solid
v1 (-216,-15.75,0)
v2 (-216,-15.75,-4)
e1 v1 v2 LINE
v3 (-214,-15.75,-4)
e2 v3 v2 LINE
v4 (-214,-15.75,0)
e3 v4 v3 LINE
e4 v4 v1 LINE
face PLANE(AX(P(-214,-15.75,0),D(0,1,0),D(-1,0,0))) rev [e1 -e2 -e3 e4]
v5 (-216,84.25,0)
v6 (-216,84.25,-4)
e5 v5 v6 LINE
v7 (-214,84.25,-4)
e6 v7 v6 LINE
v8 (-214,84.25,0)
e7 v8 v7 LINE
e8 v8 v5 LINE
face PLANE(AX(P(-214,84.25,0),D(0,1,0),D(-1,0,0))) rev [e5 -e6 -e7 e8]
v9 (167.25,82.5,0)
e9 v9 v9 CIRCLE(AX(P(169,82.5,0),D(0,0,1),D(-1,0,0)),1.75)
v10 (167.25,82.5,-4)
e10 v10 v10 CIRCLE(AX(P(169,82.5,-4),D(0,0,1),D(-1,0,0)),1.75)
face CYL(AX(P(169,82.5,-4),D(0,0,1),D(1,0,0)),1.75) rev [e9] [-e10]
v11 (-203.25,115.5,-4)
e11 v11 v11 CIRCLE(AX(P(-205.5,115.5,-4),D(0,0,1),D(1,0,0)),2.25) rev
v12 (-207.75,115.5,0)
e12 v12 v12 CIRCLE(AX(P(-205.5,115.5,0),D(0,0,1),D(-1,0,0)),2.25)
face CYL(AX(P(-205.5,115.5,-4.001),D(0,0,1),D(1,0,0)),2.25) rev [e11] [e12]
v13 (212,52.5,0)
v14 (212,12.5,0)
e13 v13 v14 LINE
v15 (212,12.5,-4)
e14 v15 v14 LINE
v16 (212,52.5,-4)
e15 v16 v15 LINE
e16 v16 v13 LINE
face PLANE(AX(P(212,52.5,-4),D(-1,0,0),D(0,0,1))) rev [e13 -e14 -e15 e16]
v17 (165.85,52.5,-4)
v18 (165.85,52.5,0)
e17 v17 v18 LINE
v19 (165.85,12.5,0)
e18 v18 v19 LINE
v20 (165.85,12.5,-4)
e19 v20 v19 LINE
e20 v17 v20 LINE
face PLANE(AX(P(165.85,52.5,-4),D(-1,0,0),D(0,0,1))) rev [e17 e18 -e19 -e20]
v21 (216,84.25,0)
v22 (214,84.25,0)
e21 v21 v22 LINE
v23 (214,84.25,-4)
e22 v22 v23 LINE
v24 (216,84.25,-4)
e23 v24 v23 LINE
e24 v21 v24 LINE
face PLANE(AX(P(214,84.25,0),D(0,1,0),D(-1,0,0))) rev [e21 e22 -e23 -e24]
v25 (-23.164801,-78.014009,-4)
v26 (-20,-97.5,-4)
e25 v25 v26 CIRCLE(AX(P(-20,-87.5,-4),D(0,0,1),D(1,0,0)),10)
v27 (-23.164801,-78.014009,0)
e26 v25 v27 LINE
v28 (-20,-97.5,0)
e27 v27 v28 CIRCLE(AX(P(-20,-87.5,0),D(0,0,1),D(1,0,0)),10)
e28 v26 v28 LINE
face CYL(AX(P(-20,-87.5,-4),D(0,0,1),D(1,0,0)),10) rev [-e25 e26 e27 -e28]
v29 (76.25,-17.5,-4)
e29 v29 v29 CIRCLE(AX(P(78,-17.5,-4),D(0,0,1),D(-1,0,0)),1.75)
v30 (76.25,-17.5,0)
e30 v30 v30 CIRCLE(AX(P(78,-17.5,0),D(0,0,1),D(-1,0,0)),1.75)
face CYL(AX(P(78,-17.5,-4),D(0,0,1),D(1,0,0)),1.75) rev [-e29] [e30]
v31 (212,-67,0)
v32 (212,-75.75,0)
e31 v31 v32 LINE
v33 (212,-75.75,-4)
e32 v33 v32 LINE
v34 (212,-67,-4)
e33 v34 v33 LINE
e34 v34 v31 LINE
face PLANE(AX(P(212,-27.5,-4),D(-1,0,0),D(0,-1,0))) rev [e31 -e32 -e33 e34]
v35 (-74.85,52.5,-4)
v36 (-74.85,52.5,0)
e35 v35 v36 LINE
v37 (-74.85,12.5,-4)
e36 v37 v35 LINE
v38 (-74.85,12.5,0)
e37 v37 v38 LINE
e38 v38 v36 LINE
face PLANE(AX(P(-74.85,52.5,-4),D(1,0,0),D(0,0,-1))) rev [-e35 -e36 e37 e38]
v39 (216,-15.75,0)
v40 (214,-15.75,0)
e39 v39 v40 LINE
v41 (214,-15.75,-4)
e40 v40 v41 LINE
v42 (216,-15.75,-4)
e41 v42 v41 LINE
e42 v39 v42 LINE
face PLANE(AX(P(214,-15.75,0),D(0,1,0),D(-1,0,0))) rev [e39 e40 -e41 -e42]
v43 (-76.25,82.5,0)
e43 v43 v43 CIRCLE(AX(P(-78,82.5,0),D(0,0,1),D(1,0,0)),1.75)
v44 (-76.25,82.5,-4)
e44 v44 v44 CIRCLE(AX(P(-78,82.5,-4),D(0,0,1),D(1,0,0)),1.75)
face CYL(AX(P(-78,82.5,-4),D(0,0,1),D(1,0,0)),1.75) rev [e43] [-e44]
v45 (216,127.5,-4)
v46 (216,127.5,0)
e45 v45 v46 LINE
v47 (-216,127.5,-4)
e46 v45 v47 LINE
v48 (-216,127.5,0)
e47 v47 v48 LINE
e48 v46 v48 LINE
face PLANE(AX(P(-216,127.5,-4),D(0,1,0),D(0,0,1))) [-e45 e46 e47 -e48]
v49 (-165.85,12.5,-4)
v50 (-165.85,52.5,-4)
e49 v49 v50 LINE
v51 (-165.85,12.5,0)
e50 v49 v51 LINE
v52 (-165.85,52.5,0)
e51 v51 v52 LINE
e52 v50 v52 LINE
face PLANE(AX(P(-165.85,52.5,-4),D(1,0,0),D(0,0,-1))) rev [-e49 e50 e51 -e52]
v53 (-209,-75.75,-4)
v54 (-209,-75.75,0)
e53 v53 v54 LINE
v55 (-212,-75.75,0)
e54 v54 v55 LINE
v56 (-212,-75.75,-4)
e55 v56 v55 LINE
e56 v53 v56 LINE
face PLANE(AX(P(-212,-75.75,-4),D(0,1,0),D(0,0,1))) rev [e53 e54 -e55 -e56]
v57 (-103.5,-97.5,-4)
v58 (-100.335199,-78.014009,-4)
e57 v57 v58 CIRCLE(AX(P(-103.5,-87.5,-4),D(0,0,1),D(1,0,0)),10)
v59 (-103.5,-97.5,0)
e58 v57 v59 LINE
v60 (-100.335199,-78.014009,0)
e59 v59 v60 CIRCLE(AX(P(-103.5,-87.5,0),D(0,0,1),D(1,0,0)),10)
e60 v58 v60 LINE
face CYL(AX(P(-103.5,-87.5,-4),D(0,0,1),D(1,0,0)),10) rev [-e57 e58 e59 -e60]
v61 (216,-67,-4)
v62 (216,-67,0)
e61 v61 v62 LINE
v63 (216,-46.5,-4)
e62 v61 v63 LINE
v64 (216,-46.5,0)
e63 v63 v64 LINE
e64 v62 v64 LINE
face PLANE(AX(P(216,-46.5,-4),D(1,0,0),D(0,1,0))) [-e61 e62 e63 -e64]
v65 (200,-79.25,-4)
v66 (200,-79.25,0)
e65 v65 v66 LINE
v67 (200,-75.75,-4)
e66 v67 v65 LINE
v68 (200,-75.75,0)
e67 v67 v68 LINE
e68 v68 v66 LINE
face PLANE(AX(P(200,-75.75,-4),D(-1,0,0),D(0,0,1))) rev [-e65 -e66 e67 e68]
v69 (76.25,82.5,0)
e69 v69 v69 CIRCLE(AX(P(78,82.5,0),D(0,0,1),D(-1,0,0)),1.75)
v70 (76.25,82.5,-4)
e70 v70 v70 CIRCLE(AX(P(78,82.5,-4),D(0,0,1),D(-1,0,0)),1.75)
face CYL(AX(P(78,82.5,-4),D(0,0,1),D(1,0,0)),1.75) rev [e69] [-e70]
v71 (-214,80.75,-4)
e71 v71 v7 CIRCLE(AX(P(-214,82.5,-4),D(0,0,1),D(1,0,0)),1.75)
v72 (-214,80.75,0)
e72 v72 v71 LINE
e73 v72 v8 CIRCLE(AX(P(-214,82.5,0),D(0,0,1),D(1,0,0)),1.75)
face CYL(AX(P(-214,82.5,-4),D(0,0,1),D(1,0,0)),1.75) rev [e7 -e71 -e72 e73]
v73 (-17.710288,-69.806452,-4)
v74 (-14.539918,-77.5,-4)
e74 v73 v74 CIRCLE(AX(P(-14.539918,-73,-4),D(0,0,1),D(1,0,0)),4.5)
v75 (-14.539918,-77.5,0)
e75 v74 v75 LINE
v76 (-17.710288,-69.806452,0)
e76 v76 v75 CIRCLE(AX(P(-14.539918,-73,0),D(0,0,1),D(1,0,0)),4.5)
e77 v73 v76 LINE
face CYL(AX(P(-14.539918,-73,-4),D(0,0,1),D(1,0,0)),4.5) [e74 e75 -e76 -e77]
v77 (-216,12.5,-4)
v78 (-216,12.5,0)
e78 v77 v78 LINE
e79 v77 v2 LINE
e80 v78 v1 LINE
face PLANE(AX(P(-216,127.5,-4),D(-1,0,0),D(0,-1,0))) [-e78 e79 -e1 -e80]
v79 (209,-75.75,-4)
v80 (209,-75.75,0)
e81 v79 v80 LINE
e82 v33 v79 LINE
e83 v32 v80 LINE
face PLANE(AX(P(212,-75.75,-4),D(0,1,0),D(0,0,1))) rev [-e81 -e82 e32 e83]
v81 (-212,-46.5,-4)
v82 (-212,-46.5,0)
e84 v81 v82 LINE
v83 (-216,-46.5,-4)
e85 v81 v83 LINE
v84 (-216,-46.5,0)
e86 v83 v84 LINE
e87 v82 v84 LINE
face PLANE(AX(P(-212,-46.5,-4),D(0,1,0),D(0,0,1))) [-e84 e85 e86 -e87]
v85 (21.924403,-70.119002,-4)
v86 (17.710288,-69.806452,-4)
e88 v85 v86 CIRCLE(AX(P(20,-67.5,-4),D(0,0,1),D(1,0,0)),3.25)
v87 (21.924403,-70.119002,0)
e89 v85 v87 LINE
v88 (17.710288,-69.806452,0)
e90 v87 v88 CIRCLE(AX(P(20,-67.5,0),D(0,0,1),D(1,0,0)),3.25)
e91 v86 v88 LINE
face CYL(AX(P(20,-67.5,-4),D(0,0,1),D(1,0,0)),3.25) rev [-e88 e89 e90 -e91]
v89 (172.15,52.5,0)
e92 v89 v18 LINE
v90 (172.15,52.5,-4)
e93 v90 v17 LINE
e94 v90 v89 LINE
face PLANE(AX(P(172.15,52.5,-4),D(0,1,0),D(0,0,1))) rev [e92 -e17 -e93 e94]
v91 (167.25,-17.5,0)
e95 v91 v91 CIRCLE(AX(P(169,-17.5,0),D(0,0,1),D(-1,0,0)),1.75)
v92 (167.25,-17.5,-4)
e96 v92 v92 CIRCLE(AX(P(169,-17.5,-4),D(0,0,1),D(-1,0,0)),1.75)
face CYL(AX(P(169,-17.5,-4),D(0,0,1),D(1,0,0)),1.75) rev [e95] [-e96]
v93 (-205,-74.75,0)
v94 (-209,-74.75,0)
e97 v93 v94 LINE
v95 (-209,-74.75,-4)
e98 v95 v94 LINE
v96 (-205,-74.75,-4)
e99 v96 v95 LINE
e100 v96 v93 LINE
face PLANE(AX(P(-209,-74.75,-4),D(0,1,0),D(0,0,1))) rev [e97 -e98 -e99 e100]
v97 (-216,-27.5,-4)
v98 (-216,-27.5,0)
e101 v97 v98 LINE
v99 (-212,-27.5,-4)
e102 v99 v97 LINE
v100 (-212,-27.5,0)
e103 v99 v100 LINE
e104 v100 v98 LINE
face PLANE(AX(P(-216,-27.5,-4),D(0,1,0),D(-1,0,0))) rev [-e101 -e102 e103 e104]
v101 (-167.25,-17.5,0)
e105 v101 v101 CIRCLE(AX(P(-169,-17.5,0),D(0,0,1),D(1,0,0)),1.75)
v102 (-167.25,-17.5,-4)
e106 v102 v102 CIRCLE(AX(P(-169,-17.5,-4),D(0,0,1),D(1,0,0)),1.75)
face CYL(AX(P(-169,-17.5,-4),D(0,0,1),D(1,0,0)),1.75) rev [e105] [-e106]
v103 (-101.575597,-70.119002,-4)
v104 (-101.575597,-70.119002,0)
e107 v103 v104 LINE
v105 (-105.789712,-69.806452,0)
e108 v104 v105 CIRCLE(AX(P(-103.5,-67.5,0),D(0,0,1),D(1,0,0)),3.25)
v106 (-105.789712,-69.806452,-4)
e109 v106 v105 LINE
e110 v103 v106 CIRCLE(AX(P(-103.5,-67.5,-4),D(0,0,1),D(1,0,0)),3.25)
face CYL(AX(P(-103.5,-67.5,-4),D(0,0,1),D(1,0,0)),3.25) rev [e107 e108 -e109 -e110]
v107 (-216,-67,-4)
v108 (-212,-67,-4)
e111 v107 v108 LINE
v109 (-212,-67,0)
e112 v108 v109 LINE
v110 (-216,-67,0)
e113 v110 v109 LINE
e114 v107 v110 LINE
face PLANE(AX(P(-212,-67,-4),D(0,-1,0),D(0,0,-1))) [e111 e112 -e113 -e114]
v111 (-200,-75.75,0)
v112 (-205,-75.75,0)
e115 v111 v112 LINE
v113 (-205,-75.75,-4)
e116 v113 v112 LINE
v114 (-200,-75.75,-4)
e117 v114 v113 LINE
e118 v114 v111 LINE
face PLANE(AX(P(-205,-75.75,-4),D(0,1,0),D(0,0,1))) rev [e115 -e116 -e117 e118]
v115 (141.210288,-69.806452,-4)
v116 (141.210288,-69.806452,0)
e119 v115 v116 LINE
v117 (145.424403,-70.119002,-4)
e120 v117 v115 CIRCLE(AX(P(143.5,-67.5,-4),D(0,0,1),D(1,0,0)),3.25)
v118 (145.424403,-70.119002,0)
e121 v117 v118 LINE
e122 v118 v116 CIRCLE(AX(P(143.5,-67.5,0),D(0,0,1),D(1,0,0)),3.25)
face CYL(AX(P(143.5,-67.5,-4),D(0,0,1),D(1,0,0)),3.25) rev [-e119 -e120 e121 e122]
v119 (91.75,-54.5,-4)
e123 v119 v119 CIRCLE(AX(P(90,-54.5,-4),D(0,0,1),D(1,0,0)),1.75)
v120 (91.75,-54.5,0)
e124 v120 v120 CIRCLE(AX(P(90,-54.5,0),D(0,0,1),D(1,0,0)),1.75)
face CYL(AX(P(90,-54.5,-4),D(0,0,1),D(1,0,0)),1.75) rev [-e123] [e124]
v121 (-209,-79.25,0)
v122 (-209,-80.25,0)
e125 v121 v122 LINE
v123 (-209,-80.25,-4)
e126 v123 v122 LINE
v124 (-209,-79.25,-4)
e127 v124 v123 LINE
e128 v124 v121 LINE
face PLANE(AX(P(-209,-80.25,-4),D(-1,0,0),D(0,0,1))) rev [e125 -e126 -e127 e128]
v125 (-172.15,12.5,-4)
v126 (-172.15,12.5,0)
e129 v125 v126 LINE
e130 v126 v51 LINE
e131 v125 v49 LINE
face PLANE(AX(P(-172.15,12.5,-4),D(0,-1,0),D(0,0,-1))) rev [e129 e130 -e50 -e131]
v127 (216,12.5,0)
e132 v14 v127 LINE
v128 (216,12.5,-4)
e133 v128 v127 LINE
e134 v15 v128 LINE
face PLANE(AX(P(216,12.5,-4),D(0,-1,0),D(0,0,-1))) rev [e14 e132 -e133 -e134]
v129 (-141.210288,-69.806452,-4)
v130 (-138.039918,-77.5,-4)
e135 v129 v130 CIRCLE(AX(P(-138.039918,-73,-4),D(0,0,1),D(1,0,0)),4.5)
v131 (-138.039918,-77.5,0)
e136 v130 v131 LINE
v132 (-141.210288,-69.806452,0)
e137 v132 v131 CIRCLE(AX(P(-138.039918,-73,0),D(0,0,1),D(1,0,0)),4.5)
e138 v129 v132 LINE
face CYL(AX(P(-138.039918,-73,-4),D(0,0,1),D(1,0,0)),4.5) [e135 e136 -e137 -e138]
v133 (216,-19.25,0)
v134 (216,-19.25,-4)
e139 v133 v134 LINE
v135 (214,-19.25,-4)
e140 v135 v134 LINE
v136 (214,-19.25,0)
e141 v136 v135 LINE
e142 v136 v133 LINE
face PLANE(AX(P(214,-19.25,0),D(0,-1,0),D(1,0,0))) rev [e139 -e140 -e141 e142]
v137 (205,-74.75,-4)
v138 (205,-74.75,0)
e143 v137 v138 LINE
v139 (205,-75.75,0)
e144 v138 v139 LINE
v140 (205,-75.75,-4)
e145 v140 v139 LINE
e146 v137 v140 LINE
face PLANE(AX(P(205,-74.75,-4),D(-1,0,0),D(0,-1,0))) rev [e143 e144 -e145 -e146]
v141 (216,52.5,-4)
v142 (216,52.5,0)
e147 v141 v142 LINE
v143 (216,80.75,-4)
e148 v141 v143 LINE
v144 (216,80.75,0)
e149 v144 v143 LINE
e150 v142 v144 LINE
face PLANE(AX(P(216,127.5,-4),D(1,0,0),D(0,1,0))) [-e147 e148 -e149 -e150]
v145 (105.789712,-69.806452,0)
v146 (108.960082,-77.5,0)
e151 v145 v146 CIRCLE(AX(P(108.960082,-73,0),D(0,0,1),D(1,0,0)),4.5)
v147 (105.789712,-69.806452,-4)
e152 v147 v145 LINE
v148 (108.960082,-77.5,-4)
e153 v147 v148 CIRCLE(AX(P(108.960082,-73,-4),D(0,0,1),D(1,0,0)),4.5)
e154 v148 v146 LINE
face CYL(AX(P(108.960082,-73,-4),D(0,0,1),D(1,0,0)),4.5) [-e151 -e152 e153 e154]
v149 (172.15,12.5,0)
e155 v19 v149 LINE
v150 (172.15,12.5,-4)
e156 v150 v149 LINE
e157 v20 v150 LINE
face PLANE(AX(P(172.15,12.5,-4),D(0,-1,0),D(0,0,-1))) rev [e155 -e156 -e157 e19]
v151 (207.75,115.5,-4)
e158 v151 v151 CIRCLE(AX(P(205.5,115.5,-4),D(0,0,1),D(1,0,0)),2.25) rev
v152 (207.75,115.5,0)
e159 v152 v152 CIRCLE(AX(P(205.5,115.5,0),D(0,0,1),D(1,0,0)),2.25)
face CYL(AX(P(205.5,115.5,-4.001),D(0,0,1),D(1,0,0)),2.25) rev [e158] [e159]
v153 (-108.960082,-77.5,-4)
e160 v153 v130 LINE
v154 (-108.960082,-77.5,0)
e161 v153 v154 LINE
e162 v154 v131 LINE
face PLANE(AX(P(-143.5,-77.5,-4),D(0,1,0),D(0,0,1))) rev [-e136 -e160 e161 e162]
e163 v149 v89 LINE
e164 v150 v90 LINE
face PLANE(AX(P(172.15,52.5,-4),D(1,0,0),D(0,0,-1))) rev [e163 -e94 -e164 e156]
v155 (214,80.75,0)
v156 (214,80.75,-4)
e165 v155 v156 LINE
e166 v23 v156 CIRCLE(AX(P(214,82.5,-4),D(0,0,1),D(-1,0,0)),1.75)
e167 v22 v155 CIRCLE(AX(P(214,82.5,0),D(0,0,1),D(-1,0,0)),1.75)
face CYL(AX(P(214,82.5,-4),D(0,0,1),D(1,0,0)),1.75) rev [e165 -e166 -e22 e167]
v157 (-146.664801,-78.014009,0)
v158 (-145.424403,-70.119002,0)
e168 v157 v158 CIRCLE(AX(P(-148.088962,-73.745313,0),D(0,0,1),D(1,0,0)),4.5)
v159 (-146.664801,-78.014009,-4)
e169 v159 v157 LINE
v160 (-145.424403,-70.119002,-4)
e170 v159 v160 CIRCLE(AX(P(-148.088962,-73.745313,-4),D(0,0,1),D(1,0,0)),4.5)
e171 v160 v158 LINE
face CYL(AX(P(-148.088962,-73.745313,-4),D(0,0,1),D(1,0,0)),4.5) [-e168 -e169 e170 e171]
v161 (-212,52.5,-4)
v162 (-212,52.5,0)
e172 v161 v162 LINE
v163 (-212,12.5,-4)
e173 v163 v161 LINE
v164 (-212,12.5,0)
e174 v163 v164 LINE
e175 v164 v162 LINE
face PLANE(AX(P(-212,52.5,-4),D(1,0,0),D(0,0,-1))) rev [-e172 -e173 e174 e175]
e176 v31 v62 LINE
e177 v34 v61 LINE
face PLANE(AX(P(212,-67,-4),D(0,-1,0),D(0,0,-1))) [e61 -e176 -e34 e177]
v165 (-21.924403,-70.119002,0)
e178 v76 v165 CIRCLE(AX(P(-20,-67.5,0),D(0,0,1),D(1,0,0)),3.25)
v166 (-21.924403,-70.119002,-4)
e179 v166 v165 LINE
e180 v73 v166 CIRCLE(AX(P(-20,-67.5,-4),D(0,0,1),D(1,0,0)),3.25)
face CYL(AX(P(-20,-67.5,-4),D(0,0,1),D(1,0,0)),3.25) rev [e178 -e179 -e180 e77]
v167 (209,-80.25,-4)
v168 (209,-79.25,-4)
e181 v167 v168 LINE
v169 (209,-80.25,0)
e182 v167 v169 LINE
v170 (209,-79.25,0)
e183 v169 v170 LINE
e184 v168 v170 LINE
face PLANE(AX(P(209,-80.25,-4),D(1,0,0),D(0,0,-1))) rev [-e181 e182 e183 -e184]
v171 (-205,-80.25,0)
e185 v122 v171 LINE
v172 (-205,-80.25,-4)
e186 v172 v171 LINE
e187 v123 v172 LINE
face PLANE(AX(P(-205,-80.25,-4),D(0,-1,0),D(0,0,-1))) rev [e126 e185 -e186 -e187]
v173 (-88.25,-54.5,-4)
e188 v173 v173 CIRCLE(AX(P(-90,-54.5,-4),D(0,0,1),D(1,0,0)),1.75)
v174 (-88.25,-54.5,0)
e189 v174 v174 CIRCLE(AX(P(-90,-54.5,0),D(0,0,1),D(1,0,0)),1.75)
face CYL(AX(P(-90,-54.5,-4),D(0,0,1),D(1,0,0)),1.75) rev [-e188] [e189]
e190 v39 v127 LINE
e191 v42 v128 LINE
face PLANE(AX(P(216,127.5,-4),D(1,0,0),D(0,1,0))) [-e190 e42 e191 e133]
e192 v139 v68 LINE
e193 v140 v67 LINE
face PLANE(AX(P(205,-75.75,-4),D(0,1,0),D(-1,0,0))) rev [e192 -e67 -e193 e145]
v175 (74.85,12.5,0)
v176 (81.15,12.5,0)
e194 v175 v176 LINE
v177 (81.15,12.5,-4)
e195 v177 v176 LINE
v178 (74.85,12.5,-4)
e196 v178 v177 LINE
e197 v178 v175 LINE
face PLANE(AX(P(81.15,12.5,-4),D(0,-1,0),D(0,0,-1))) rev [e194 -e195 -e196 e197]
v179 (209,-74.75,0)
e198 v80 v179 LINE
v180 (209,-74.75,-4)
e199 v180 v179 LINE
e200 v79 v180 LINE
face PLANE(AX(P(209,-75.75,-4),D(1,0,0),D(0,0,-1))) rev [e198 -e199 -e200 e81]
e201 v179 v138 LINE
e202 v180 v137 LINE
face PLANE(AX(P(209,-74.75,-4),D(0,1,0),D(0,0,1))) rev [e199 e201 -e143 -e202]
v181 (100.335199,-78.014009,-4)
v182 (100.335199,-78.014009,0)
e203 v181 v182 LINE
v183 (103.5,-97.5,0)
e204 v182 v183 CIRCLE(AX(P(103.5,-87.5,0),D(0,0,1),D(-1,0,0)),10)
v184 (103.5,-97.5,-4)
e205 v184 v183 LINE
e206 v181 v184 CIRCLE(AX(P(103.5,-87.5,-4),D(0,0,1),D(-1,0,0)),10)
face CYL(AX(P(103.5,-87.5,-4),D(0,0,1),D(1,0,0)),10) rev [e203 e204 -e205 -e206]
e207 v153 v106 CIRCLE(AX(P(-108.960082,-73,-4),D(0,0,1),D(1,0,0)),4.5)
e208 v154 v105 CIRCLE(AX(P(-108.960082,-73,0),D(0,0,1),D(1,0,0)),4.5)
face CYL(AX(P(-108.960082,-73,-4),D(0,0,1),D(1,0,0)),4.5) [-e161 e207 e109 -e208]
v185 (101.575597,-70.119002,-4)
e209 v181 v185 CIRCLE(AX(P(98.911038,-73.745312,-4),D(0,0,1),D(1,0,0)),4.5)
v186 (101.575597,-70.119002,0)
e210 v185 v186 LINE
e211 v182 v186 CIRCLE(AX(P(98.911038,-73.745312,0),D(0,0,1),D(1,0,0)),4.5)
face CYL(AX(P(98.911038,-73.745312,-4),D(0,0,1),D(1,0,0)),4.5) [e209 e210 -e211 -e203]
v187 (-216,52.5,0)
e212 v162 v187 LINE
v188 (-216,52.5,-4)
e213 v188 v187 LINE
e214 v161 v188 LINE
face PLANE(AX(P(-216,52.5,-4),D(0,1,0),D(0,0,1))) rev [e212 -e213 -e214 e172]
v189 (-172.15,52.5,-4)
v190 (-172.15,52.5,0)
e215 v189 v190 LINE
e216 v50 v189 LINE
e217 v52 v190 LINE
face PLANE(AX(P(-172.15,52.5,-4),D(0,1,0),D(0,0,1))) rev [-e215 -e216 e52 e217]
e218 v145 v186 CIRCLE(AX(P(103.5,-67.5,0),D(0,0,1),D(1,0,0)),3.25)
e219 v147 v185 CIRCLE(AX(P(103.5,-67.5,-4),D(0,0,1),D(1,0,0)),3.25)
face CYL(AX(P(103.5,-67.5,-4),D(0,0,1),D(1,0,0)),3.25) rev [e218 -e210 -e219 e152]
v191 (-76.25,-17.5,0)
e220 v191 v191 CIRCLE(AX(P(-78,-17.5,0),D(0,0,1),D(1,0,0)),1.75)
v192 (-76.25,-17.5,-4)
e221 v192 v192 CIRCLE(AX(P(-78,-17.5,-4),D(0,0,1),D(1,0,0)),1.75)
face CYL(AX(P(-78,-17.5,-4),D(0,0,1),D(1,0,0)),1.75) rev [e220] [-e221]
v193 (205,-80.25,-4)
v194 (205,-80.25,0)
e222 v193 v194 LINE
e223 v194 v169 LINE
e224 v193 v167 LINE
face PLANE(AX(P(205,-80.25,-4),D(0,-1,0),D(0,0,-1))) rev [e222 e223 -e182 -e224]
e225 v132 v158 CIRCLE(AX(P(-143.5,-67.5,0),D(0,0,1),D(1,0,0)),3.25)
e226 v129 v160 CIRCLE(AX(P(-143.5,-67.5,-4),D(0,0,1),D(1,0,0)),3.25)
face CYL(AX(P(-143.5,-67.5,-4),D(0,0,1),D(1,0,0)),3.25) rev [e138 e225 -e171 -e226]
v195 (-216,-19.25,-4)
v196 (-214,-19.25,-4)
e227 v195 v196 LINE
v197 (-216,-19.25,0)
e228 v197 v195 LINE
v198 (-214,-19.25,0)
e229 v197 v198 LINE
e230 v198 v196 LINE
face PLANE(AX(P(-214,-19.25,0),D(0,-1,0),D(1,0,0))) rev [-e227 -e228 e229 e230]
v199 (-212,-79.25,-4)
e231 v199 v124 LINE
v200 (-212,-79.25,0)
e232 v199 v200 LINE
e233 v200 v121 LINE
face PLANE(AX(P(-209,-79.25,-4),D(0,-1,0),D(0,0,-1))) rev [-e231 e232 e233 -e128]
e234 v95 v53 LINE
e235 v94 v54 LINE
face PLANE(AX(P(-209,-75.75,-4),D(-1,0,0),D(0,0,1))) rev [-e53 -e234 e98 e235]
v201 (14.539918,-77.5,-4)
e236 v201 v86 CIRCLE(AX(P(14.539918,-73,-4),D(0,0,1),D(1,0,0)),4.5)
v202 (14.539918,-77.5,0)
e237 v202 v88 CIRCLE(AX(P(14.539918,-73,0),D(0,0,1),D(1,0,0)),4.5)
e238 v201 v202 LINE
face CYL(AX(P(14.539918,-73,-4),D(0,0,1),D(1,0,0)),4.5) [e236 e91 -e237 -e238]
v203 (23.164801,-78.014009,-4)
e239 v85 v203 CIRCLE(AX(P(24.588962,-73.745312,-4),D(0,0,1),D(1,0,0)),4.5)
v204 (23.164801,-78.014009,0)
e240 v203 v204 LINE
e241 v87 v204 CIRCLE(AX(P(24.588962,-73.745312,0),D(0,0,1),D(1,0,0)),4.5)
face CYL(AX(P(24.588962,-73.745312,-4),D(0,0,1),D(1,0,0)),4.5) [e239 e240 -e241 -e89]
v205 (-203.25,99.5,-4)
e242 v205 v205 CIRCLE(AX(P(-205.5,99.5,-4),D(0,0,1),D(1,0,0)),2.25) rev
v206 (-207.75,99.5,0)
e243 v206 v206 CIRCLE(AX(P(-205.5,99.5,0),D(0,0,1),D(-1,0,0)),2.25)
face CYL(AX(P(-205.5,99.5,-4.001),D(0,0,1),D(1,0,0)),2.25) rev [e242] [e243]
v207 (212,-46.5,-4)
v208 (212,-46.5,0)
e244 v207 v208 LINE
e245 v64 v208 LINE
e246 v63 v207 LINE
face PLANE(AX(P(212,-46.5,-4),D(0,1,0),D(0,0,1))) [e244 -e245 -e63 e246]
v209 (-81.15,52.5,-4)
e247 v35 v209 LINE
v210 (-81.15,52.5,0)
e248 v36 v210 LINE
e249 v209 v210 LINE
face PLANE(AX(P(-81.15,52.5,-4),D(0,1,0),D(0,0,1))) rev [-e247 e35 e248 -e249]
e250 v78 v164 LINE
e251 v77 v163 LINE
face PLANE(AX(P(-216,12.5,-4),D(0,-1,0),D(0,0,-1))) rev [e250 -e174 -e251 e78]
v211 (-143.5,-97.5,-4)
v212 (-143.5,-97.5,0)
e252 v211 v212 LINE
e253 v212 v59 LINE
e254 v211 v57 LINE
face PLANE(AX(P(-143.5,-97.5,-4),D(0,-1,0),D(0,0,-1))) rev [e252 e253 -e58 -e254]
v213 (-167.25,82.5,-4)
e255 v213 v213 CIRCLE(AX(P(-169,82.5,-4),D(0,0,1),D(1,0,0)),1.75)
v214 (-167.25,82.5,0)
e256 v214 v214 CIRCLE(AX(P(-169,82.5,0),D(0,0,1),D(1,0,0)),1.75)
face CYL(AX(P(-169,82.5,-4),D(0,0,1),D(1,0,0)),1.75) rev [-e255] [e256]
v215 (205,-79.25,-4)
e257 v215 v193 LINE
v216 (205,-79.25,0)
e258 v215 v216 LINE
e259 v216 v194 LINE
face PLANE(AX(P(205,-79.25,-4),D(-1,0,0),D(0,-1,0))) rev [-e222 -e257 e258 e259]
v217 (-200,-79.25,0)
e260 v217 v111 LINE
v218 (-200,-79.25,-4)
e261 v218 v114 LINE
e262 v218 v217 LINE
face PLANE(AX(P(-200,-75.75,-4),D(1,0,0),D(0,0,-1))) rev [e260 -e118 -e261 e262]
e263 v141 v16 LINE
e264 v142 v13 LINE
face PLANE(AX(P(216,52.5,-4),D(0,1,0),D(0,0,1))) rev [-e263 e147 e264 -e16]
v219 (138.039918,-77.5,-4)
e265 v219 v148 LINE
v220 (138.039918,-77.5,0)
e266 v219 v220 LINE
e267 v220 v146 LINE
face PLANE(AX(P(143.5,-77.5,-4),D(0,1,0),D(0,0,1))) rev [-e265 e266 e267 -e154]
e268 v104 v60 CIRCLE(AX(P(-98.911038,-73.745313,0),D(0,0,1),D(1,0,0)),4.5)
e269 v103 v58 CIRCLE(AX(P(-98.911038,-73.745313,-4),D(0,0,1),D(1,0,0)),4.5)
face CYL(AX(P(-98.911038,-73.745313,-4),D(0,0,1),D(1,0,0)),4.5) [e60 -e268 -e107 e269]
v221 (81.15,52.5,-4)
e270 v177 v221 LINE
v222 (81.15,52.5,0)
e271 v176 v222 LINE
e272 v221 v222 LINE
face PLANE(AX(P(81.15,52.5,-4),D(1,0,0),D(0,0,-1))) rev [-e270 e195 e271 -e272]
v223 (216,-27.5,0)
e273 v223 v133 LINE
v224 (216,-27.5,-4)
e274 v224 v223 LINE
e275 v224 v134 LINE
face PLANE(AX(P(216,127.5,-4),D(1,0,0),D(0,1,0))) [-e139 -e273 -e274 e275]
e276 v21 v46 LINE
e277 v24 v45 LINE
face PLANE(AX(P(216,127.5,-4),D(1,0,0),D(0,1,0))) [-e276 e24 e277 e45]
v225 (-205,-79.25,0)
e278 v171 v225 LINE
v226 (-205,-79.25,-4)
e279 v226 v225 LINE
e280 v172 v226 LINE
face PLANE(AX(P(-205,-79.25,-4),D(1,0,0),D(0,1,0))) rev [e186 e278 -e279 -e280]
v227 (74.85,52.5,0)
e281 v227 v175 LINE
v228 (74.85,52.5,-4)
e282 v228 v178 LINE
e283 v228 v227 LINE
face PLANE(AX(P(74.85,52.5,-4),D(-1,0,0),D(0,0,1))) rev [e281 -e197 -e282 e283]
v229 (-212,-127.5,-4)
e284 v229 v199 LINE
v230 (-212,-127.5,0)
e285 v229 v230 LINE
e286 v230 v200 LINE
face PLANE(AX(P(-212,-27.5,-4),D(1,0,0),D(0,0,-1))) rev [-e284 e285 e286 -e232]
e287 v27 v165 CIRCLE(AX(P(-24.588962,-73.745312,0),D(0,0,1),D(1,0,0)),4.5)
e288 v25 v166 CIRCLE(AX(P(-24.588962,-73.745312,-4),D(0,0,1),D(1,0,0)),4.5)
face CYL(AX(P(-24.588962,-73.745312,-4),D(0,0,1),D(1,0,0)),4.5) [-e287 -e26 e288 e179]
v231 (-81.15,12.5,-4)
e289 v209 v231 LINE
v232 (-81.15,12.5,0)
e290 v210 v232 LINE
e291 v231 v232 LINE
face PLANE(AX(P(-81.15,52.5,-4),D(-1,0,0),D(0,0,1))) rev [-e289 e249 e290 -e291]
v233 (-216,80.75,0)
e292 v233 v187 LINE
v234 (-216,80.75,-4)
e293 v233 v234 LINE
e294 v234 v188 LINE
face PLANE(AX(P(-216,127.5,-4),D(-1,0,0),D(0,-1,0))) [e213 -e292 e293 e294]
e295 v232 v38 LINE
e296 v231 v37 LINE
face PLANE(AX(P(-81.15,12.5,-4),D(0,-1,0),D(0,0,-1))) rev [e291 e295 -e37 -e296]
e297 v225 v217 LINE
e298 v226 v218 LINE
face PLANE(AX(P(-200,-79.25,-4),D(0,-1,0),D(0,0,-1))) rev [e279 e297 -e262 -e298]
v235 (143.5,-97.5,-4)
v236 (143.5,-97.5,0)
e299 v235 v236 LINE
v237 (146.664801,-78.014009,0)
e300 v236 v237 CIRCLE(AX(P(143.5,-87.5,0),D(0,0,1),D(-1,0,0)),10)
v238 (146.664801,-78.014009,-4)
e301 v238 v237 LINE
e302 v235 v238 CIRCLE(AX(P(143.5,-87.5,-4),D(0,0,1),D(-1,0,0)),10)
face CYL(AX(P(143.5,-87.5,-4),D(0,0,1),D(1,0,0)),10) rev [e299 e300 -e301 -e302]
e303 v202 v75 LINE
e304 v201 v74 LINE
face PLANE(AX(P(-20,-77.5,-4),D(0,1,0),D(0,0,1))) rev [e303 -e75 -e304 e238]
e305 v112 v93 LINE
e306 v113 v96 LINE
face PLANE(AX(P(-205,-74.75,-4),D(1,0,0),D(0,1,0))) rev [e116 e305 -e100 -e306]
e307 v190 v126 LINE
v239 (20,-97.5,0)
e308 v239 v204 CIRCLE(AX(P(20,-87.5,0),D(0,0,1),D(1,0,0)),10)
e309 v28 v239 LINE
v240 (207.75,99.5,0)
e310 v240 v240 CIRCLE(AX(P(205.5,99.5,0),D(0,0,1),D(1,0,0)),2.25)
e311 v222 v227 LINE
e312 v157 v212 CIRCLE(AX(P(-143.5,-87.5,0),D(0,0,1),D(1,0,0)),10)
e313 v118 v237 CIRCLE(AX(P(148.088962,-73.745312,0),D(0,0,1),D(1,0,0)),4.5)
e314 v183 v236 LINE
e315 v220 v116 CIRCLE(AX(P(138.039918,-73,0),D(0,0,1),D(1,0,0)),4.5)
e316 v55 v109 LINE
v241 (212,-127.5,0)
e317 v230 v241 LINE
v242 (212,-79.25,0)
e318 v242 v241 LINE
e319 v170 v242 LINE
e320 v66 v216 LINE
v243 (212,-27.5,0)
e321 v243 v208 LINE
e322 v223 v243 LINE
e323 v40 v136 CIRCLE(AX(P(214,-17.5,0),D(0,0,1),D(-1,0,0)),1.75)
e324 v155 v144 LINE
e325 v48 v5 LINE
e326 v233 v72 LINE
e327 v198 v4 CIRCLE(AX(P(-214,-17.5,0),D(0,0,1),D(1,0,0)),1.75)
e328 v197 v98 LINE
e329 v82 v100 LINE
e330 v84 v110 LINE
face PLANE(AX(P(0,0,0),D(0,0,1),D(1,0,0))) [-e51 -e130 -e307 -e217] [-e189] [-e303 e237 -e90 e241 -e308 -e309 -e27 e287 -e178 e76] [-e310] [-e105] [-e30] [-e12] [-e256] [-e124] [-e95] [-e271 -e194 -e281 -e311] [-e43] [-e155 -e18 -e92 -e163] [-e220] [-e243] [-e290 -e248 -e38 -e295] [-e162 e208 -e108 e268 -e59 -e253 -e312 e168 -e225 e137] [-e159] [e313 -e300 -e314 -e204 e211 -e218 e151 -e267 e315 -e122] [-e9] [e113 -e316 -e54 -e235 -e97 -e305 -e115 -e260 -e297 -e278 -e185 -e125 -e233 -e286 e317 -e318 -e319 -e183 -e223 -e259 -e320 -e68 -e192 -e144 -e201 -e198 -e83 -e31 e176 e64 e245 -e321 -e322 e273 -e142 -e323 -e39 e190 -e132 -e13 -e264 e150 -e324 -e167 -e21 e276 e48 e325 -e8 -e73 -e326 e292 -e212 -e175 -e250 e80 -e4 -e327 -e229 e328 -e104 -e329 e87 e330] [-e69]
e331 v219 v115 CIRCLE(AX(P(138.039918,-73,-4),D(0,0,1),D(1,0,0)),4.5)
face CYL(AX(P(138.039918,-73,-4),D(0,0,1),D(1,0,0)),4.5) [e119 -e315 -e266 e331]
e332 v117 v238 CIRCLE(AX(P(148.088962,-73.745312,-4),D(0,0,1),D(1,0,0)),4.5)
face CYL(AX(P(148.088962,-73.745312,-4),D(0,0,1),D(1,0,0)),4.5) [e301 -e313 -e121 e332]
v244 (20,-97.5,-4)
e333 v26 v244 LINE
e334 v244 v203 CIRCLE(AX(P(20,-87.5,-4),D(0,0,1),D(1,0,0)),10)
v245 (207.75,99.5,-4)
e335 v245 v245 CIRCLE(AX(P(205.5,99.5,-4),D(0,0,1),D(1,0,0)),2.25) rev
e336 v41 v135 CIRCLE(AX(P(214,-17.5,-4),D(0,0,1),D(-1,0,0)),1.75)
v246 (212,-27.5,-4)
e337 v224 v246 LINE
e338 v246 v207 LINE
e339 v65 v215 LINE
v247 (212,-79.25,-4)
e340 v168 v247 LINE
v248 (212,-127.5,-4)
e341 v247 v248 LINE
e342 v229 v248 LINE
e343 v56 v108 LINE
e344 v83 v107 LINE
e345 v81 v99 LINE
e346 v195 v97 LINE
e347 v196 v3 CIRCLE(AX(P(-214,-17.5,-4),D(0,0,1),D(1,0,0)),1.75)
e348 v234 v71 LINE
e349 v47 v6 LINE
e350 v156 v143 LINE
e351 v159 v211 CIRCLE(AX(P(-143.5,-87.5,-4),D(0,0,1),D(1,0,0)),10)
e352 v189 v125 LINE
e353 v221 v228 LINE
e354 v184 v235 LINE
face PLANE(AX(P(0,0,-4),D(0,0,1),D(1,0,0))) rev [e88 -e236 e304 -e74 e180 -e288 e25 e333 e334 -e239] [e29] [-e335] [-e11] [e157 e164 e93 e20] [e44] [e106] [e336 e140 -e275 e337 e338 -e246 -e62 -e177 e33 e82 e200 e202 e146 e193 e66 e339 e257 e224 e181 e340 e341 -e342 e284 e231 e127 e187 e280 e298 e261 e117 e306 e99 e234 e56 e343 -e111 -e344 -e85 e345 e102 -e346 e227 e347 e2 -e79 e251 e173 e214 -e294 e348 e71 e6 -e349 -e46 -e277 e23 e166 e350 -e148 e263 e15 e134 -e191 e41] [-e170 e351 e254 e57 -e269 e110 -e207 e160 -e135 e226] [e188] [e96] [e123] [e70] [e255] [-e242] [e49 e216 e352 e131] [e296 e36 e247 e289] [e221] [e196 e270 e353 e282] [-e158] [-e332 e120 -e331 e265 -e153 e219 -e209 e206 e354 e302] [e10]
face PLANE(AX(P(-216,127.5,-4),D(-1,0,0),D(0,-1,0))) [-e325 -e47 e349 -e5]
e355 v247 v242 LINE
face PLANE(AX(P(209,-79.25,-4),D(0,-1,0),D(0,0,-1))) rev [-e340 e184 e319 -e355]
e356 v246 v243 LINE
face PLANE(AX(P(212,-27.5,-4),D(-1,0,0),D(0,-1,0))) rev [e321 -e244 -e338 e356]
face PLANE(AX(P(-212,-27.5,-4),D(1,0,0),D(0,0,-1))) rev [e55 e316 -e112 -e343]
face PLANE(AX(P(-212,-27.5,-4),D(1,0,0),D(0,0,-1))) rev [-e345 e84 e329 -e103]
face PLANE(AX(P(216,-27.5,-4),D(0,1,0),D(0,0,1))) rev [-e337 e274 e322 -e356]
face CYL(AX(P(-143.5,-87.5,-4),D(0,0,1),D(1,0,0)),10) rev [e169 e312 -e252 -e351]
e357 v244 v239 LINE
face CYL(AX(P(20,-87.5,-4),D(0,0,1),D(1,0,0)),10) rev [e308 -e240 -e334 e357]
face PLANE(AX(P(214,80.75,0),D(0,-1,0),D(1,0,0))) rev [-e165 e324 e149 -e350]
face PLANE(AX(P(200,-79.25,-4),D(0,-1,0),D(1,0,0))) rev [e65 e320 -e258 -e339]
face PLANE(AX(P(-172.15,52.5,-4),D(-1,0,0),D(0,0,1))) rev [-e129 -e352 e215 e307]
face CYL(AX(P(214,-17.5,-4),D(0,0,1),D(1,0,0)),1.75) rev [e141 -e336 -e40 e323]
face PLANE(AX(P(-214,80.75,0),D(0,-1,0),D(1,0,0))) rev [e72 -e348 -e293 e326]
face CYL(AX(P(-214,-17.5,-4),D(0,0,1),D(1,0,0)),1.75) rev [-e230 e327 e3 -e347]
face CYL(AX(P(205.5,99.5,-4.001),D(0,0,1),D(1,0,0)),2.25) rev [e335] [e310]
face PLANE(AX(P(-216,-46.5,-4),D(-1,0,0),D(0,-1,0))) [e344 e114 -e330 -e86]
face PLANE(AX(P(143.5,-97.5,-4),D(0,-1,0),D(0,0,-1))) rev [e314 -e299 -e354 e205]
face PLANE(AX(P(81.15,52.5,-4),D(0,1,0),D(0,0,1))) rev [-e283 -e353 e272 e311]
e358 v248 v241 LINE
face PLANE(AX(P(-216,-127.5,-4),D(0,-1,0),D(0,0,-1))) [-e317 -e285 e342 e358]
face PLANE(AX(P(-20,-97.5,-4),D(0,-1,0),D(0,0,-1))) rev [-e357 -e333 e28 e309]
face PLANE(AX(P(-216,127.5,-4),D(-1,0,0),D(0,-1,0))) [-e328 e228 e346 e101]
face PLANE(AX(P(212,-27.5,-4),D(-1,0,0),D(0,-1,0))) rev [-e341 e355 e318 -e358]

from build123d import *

# Parameters (mm, degrees)
SKETCH1_W          = 432
SKETCH1_H          = 255
BASE_FLANGE1_DEPTH = 4
SKETCH4_R          = 1.75
SKETCH4_W          = 4
SKETCH4_H          = 40
SKETCH4_W_2        = 6.3
CUT_EXTRUDE1_DEPTH = 251.855037821
CUT_EXTRUDE2_DEPTH = 251.855037821
SKETCH6_R          = 1.75
CUT_EXTRUDE3_DEPTH = 251.855037821
CUT_EXTRUDE4_REACH = 252.855
SKETCH7_R          = 2.25
SKETCH8_R          = 3.25
CUT_EXTRUDE5_DEPTH = 251.855037821
CUT_EXTRUDE6_DEPTH = 251.855037821
SKETCH10_W         = 4
SKETCH10_H         = 100
CUT_EXTRUDE7_DEPTH = 251.855037821
CUT_EXTRUDE8_DEPTH = 251.855037821
SKETCH13_W         = 4
SKETCH13_H         = 20.5
TAB1_DEPTH         = 4
CUT_EXTRUDE9_REACH = 252.855


# Sheet-metal steps are written as plain solids
with BuildPart() as part:
    # Sketch1 → Base-Flange1 (new body)
    with BuildSketch(Plane.XY):
        Rectangle(SKETCH1_W, SKETCH1_H)
    extrude(amount=-BASE_FLANGE1_DEPTH)

    # Sketch4 → Cut-Extrude1 (cut, through all)
    with BuildSketch(Plane.XY):
        with Locations((-78, 82.5)):
            Circle(SKETCH4_R)
        with Locations(Location((214, -17.5, 0), (0, 0, 180))):
            Circle(SKETCH4_R)
        with Locations(Location((214, 82.5, 0), (0, 0, 180))):
            Circle(SKETCH4_R)
        with Locations((-78, -17.5)):
            Circle(SKETCH4_R)
        with Locations((-169, -17.5)):
            Circle(SKETCH4_R)
        with Locations((-169, 82.5)):
            Circle(SKETCH4_R)
        with Locations((-214, 82.5)):
            Circle(SKETCH4_R)
        with Locations((-214, -17.5)):
            Circle(SKETCH4_R)
        with Locations(Location((169, 82.5, 0), (0, 0, 180))):
            Circle(SKETCH4_R)
        with Locations(Location((169, -17.5, 0), (0, 0, 180))):
            Circle(SKETCH4_R)
        with Locations(Location((78, -17.5, 0), (0, 0, 180))):
            Circle(SKETCH4_R)
        with Locations(Location((78, 82.5, 0), (0, 0, 180))):
            Circle(SKETCH4_R)
        with Locations((-214, 32.5)):
            Rectangle(SKETCH4_W, SKETCH4_H)
        with Locations((-169, 32.5)):
            Rectangle(SKETCH4_W_2, SKETCH4_H)
        with Locations((-78, 32.5)):
            Rectangle(SKETCH4_W_2, SKETCH4_H)
        with Locations((78, 32.5)):
            Rectangle(SKETCH4_W_2, SKETCH4_H)
        with Locations((169, 32.5)):
            Rectangle(SKETCH4_W_2, SKETCH4_H)
        with Locations((214, 32.5)):
            Rectangle(SKETCH4_W, SKETCH4_H)
    extrude(amount=-CUT_EXTRUDE1_DEPTH, mode=Mode.SUBTRACT)

    # Sketch5 → Cut-Extrude2 (cut, through all)
    with BuildSketch(Plane.XY):
        with BuildLine():
            Line((-214, 80.75), (-216, 80.75))
            ThreePointArc((-216, 80.75), (-217.75, 82.5), (-216, 84.25))
            Line((-216, 84.25), (-214, 84.25))
            ThreePointArc((-214, 84.25), (-212.25, 82.5), (-214, 80.75))
        make_face()
        with BuildLine():
            Line((-214, -19.25), (-216, -19.25))
            ThreePointArc((-216, -19.25), (-217.75, -17.5), (-216, -15.75))
            Line((-216, -15.75), (-214, -15.75))
            ThreePointArc((-214, -15.75), (-212.25, -17.5), (-214, -19.25))
        make_face()
        with BuildLine():
            Line((214, 80.75), (216, 80.75))
            ThreePointArc((216, 80.75), (217.75, 82.5), (216, 84.25))
            Line((216, 84.25), (214, 84.25))
            ThreePointArc((214, 84.25), (212.25, 82.5), (214, 80.75))
        make_face()
        with BuildLine():
            Line((214, -19.25), (216, -19.25))
            ThreePointArc((216, -19.25), (217.75, -17.5), (216, -15.75))
            Line((216, -15.75), (214, -15.75))
            ThreePointArc((214, -15.75), (212.25, -17.5), (214, -19.25))
        make_face()
    extrude(amount=-CUT_EXTRUDE2_DEPTH, mode=Mode.SUBTRACT)

    # Sketch6 → Cut-Extrude3 (cut, through all)
    with BuildSketch(Plane.XY):
        with Locations((-90, -54.5)):
            Circle(SKETCH6_R)
        with Locations((90, -54.5)):
            Circle(SKETCH6_R)
    extrude(amount=-CUT_EXTRUDE3_DEPTH, mode=Mode.SUBTRACT)

    # Sketch7 → Cut-Extrude4 (cut, up to next)
    with BuildSketch(Plane.XY, mode=Mode.PRIVATE) as cut_extrude4_sk1:
        with Locations((205.5, 115.5)):
            Circle(SKETCH7_R)
    cut_extrude4_tool1 = extrude(cut_extrude4_sk1.sketch, amount=-CUT_EXTRUDE4_REACH, mode=Mode.PRIVATE) & part.part
    # Sketch7 → Cut-Extrude4 (cut, up to next)
    with BuildSketch(Plane.XY, mode=Mode.PRIVATE) as cut_extrude4_sk2:
        with Locations((205.5, 99.5)):
            Circle(SKETCH7_R)
    cut_extrude4_tool2 = extrude(cut_extrude4_sk2.sketch, amount=-CUT_EXTRUDE4_REACH, mode=Mode.PRIVATE) & part.part
    # Sketch7 → Cut-Extrude4 (cut, up to next)
    with BuildSketch(Plane.XY, mode=Mode.PRIVATE) as cut_extrude4_sk3:
        with Locations((-205.5, 99.5)):
            Circle(SKETCH7_R)
    cut_extrude4_tool3 = extrude(cut_extrude4_sk3.sketch, amount=-CUT_EXTRUDE4_REACH, mode=Mode.PRIVATE) & part.part
    # Sketch7 → Cut-Extrude4 (cut, up to next)
    with BuildSketch(Plane.XY, mode=Mode.PRIVATE) as cut_extrude4_sk4:
        with Locations((-205.5, 115.5)):
            Circle(SKETCH7_R)
    cut_extrude4_tool4 = extrude(cut_extrude4_sk4.sketch, amount=-CUT_EXTRUDE4_REACH, mode=Mode.PRIVATE) & part.part
    add(cut_extrude4_tool1.solids().sort_by_distance((205.5, 115.5, 0))[0], mode=Mode.SUBTRACT)
    add(cut_extrude4_tool2.solids().sort_by_distance((205.5, 99.5, 0))[0], mode=Mode.SUBTRACT)
    add(cut_extrude4_tool3.solids().sort_by_distance((-205.5, 99.5, 0))[0], mode=Mode.SUBTRACT)
    add(cut_extrude4_tool4.solids().sort_by_distance((-205.5, 115.5, 0))[0], mode=Mode.SUBTRACT)

    # Sketch8 → Cut-Extrude5 (cut, through all)
    with BuildSketch(Plane.XY):
        with Locations((-143.5, -67.5)):
            Circle(SKETCH8_R)
        with Locations((-103.5, -67.5)):
            Circle(SKETCH8_R)
        with Locations((-20, -67.5)):
            Circle(SKETCH8_R)
        with Locations((20, -67.5)):
            Circle(SKETCH8_R)
        with Locations((103.5, -67.5)):
            Circle(SKETCH8_R)
        with Locations((143.5, -67.5)):
            Circle(SKETCH8_R)
    extrude(amount=-CUT_EXTRUDE5_DEPTH, mode=Mode.SUBTRACT)

    # Sketch9 → Cut-Extrude6 (cut, through all)
    with BuildSketch(Plane.XY):
        with BuildLine():
            Line((-143.5, -77.5), (-103.5, -77.5))
            ThreePointArc((-103.5, -77.5), (-93.5, -87.5), (-103.5, -97.5))
            Line((-103.5, -97.5), (-143.5, -97.5))
            ThreePointArc((-143.5, -97.5), (-153.5, -87.5), (-143.5, -77.5))
        make_face()
        with BuildLine():
            Line((-20, -77.5), (20, -77.5))
            ThreePointArc((20, -77.5), (30, -87.5), (20, -97.5))
            Line((20, -97.5), (-20, -97.5))
            ThreePointArc((-20, -97.5), (-30, -87.5), (-20, -77.5))
        make_face()
        with BuildLine():
            Line((143.5, -77.5), (103.5, -77.5))
            ThreePointArc((103.5, -77.5), (93.5, -87.5), (103.5, -97.5))
            Line((103.5, -97.5), (143.5, -97.5))
            ThreePointArc((143.5, -97.5), (153.5, -87.5), (143.5, -77.5))
        make_face()
    extrude(amount=-CUT_EXTRUDE6_DEPTH, mode=Mode.SUBTRACT)

    # Sketch10 → Cut-Extrude7 (cut, through all)
    with BuildSketch(Plane.XY):
        with Locations((-214, -77.5)):
            Rectangle(SKETCH10_W, SKETCH10_H)
        with Locations((214, -77.5)):
            Rectangle(SKETCH10_W, SKETCH10_H)
    extrude(amount=-CUT_EXTRUDE7_DEPTH, mode=Mode.SUBTRACT)

    # Sketch11 → Cut-Extrude8 (cut, through all)
    with BuildSketch(Plane.XY):
        Polygon((-212, -75.75), (-209, -75.75), (-209, -74.75), (-205, -74.75), (-205, -75.75), (-200, -75.75), (-200, -79.25), (-205, -79.25), (-205, -80.25), (-209, -80.25), (-209, -79.25), (-212, -79.25), align=None)
        Polygon((212, -79.25), (212, -75.75), (209, -75.75), (209, -74.75), (205, -74.75), (205, -75.75), (200, -75.75), (200, -79.25), (205, -79.25), (205, -80.25), (209, -80.25), (209, -79.25), align=None)
    extrude(amount=-CUT_EXTRUDE8_DEPTH, mode=Mode.SUBTRACT)

    # Sketch13 → Tab1 (add)
    with BuildSketch(Plane.XY):
        with Locations((-214, -56.75)):
            Rectangle(SKETCH13_W, SKETCH13_H)
        with Locations((214, -56.75)):
            Rectangle(SKETCH13_W, SKETCH13_H)
    extrude(amount=-TAB1_DEPTH)

    # Sketch14 → Cut-Extrude9 (cut, up to next)
    with BuildSketch(Plane.XY, mode=Mode.PRIVATE) as cut_extrude9_sk1:
        with BuildLine():
            Line((-145.424403398, -70.119002016), (-141.210288019, -69.806451613))
            ThreePointArc((-141.210288019, -69.806451613), (-142.200504545, -74.714501715), (-138.039917583, -77.5))
            Line((-138.039917583, -77.5), (-146.664801345, -78.014008621))
            ThreePointArc((-146.664801345, -78.014008621), (-143.64349365, -74.443747603), (-145.424403398, -70.119002016))
        make_face()
    cut_extrude9_tool1 = extrude(cut_extrude9_sk1.sketch, amount=-CUT_EXTRUDE9_REACH, mode=Mode.PRIVATE) & part.part
    # Sketch14 → Cut-Extrude9 (cut, up to next)
    with BuildSketch(Plane.XY, mode=Mode.PRIVATE) as cut_extrude9_sk2:
        with BuildLine():
            Line((-105.789711981, -69.806451613), (-101.575596602, -70.119002016))
            ThreePointArc((-101.575596602, -70.119002016), (-103.35650635, -74.443747603), (-100.335198655, -78.014008621))
            Line((-100.335198655, -78.014008621), (-108.960082417, -77.5))
            ThreePointArc((-108.960082417, -77.5), (-104.799495455, -74.714501715), (-105.789711981, -69.806451613))
        make_face()
    cut_extrude9_tool2 = extrude(cut_extrude9_sk2.sketch, amount=-CUT_EXTRUDE9_REACH, mode=Mode.PRIVATE) & part.part
    # Sketch14 → Cut-Extrude9 (cut, up to next)
    with BuildSketch(Plane.XY, mode=Mode.PRIVATE) as cut_extrude9_sk3:
        with BuildLine():
            Line((-21.924403398, -70.119002016), (-17.710288019, -69.806451613))
            ThreePointArc((-17.710288019, -69.806451613), (-18.700504545, -74.714501715), (-14.539917583, -77.5))
            Line((-14.539917583, -77.5), (-23.164801345, -78.014008621))
            ThreePointArc((-23.164801345, -78.014008621), (-20.14349365, -74.443747603), (-21.924403398, -70.119002016))
        make_face()
    cut_extrude9_tool3 = extrude(cut_extrude9_sk3.sketch, amount=-CUT_EXTRUDE9_REACH, mode=Mode.PRIVATE) & part.part
    # Sketch14 → Cut-Extrude9 (cut, up to next)
    with BuildSketch(Plane.XY, mode=Mode.PRIVATE) as cut_extrude9_sk4:
        with BuildLine():
            Line((17.710288019, -69.806451613), (21.924403398, -70.119002016))
            ThreePointArc((21.924403398, -70.119002016), (20.14349365, -74.443747603), (23.164801345, -78.014008621))
            Line((23.164801345, -78.014008621), (14.539917583, -77.5))
            ThreePointArc((14.539917583, -77.5), (18.700504545, -74.714501715), (17.710288019, -69.806451613))
        make_face()
    cut_extrude9_tool4 = extrude(cut_extrude9_sk4.sketch, amount=-CUT_EXTRUDE9_REACH, mode=Mode.PRIVATE) & part.part
    # Sketch14 → Cut-Extrude9 (cut, up to next)
    with BuildSketch(Plane.XY, mode=Mode.PRIVATE) as cut_extrude9_sk5:
        with BuildLine():
            Line((101.575596602, -70.119002016), (105.789711981, -69.806451613))
            ThreePointArc((105.789711981, -69.806451613), (104.799495455, -74.714501715), (108.960082417, -77.5))
            Line((108.960082417, -77.5), (100.335198655, -78.014008621))
            ThreePointArc((100.335198655, -78.014008621), (103.35650635, -74.443747603), (101.575596602, -70.119002016))
        make_face()
    cut_extrude9_tool5 = extrude(cut_extrude9_sk5.sketch, amount=-CUT_EXTRUDE9_REACH, mode=Mode.PRIVATE) & part.part
    # Sketch14 → Cut-Extrude9 (cut, up to next)
    with BuildSketch(Plane.XY, mode=Mode.PRIVATE) as cut_extrude9_sk6:
        with BuildLine():
            Line((141.210288019, -69.806451613), (145.424403398, -70.119002016))
            ThreePointArc((145.424403398, -70.119002016), (143.64349365, -74.443747603), (146.664801345, -78.014008621))
            Line((146.664801345, -78.014008621), (138.039917583, -77.5))
            ThreePointArc((138.039917583, -77.5), (142.200504545, -74.714501715), (141.210288019, -69.806451613))
        make_face()
    cut_extrude9_tool6 = extrude(cut_extrude9_sk6.sketch, amount=-CUT_EXTRUDE9_REACH, mode=Mode.PRIVATE) & part.part
    add(cut_extrude9_tool1.solids().sort_by_distance((-142.940406, -74.543394, 0))[0], mode=Mode.SUBTRACT)
    add(cut_extrude9_tool2.solids().sort_by_distance((-104.059594, -74.543394, 0))[0], mode=Mode.SUBTRACT)
    add(cut_extrude9_tool3.solids().sort_by_distance((-19.440406, -74.543394, 0))[0], mode=Mode.SUBTRACT)
    add(cut_extrude9_tool4.solids().sort_by_distance((19.440406, -74.543394, 0))[0], mode=Mode.SUBTRACT)
    add(cut_extrude9_tool5.solids().sort_by_distance((104.059594, -74.543394, 0))[0], mode=Mode.SUBTRACT)
    add(cut_extrude9_tool6.solids().sort_by_distance((142.940406, -74.543394, 0))[0], mode=Mode.SUBTRACT)


solid = part.part
